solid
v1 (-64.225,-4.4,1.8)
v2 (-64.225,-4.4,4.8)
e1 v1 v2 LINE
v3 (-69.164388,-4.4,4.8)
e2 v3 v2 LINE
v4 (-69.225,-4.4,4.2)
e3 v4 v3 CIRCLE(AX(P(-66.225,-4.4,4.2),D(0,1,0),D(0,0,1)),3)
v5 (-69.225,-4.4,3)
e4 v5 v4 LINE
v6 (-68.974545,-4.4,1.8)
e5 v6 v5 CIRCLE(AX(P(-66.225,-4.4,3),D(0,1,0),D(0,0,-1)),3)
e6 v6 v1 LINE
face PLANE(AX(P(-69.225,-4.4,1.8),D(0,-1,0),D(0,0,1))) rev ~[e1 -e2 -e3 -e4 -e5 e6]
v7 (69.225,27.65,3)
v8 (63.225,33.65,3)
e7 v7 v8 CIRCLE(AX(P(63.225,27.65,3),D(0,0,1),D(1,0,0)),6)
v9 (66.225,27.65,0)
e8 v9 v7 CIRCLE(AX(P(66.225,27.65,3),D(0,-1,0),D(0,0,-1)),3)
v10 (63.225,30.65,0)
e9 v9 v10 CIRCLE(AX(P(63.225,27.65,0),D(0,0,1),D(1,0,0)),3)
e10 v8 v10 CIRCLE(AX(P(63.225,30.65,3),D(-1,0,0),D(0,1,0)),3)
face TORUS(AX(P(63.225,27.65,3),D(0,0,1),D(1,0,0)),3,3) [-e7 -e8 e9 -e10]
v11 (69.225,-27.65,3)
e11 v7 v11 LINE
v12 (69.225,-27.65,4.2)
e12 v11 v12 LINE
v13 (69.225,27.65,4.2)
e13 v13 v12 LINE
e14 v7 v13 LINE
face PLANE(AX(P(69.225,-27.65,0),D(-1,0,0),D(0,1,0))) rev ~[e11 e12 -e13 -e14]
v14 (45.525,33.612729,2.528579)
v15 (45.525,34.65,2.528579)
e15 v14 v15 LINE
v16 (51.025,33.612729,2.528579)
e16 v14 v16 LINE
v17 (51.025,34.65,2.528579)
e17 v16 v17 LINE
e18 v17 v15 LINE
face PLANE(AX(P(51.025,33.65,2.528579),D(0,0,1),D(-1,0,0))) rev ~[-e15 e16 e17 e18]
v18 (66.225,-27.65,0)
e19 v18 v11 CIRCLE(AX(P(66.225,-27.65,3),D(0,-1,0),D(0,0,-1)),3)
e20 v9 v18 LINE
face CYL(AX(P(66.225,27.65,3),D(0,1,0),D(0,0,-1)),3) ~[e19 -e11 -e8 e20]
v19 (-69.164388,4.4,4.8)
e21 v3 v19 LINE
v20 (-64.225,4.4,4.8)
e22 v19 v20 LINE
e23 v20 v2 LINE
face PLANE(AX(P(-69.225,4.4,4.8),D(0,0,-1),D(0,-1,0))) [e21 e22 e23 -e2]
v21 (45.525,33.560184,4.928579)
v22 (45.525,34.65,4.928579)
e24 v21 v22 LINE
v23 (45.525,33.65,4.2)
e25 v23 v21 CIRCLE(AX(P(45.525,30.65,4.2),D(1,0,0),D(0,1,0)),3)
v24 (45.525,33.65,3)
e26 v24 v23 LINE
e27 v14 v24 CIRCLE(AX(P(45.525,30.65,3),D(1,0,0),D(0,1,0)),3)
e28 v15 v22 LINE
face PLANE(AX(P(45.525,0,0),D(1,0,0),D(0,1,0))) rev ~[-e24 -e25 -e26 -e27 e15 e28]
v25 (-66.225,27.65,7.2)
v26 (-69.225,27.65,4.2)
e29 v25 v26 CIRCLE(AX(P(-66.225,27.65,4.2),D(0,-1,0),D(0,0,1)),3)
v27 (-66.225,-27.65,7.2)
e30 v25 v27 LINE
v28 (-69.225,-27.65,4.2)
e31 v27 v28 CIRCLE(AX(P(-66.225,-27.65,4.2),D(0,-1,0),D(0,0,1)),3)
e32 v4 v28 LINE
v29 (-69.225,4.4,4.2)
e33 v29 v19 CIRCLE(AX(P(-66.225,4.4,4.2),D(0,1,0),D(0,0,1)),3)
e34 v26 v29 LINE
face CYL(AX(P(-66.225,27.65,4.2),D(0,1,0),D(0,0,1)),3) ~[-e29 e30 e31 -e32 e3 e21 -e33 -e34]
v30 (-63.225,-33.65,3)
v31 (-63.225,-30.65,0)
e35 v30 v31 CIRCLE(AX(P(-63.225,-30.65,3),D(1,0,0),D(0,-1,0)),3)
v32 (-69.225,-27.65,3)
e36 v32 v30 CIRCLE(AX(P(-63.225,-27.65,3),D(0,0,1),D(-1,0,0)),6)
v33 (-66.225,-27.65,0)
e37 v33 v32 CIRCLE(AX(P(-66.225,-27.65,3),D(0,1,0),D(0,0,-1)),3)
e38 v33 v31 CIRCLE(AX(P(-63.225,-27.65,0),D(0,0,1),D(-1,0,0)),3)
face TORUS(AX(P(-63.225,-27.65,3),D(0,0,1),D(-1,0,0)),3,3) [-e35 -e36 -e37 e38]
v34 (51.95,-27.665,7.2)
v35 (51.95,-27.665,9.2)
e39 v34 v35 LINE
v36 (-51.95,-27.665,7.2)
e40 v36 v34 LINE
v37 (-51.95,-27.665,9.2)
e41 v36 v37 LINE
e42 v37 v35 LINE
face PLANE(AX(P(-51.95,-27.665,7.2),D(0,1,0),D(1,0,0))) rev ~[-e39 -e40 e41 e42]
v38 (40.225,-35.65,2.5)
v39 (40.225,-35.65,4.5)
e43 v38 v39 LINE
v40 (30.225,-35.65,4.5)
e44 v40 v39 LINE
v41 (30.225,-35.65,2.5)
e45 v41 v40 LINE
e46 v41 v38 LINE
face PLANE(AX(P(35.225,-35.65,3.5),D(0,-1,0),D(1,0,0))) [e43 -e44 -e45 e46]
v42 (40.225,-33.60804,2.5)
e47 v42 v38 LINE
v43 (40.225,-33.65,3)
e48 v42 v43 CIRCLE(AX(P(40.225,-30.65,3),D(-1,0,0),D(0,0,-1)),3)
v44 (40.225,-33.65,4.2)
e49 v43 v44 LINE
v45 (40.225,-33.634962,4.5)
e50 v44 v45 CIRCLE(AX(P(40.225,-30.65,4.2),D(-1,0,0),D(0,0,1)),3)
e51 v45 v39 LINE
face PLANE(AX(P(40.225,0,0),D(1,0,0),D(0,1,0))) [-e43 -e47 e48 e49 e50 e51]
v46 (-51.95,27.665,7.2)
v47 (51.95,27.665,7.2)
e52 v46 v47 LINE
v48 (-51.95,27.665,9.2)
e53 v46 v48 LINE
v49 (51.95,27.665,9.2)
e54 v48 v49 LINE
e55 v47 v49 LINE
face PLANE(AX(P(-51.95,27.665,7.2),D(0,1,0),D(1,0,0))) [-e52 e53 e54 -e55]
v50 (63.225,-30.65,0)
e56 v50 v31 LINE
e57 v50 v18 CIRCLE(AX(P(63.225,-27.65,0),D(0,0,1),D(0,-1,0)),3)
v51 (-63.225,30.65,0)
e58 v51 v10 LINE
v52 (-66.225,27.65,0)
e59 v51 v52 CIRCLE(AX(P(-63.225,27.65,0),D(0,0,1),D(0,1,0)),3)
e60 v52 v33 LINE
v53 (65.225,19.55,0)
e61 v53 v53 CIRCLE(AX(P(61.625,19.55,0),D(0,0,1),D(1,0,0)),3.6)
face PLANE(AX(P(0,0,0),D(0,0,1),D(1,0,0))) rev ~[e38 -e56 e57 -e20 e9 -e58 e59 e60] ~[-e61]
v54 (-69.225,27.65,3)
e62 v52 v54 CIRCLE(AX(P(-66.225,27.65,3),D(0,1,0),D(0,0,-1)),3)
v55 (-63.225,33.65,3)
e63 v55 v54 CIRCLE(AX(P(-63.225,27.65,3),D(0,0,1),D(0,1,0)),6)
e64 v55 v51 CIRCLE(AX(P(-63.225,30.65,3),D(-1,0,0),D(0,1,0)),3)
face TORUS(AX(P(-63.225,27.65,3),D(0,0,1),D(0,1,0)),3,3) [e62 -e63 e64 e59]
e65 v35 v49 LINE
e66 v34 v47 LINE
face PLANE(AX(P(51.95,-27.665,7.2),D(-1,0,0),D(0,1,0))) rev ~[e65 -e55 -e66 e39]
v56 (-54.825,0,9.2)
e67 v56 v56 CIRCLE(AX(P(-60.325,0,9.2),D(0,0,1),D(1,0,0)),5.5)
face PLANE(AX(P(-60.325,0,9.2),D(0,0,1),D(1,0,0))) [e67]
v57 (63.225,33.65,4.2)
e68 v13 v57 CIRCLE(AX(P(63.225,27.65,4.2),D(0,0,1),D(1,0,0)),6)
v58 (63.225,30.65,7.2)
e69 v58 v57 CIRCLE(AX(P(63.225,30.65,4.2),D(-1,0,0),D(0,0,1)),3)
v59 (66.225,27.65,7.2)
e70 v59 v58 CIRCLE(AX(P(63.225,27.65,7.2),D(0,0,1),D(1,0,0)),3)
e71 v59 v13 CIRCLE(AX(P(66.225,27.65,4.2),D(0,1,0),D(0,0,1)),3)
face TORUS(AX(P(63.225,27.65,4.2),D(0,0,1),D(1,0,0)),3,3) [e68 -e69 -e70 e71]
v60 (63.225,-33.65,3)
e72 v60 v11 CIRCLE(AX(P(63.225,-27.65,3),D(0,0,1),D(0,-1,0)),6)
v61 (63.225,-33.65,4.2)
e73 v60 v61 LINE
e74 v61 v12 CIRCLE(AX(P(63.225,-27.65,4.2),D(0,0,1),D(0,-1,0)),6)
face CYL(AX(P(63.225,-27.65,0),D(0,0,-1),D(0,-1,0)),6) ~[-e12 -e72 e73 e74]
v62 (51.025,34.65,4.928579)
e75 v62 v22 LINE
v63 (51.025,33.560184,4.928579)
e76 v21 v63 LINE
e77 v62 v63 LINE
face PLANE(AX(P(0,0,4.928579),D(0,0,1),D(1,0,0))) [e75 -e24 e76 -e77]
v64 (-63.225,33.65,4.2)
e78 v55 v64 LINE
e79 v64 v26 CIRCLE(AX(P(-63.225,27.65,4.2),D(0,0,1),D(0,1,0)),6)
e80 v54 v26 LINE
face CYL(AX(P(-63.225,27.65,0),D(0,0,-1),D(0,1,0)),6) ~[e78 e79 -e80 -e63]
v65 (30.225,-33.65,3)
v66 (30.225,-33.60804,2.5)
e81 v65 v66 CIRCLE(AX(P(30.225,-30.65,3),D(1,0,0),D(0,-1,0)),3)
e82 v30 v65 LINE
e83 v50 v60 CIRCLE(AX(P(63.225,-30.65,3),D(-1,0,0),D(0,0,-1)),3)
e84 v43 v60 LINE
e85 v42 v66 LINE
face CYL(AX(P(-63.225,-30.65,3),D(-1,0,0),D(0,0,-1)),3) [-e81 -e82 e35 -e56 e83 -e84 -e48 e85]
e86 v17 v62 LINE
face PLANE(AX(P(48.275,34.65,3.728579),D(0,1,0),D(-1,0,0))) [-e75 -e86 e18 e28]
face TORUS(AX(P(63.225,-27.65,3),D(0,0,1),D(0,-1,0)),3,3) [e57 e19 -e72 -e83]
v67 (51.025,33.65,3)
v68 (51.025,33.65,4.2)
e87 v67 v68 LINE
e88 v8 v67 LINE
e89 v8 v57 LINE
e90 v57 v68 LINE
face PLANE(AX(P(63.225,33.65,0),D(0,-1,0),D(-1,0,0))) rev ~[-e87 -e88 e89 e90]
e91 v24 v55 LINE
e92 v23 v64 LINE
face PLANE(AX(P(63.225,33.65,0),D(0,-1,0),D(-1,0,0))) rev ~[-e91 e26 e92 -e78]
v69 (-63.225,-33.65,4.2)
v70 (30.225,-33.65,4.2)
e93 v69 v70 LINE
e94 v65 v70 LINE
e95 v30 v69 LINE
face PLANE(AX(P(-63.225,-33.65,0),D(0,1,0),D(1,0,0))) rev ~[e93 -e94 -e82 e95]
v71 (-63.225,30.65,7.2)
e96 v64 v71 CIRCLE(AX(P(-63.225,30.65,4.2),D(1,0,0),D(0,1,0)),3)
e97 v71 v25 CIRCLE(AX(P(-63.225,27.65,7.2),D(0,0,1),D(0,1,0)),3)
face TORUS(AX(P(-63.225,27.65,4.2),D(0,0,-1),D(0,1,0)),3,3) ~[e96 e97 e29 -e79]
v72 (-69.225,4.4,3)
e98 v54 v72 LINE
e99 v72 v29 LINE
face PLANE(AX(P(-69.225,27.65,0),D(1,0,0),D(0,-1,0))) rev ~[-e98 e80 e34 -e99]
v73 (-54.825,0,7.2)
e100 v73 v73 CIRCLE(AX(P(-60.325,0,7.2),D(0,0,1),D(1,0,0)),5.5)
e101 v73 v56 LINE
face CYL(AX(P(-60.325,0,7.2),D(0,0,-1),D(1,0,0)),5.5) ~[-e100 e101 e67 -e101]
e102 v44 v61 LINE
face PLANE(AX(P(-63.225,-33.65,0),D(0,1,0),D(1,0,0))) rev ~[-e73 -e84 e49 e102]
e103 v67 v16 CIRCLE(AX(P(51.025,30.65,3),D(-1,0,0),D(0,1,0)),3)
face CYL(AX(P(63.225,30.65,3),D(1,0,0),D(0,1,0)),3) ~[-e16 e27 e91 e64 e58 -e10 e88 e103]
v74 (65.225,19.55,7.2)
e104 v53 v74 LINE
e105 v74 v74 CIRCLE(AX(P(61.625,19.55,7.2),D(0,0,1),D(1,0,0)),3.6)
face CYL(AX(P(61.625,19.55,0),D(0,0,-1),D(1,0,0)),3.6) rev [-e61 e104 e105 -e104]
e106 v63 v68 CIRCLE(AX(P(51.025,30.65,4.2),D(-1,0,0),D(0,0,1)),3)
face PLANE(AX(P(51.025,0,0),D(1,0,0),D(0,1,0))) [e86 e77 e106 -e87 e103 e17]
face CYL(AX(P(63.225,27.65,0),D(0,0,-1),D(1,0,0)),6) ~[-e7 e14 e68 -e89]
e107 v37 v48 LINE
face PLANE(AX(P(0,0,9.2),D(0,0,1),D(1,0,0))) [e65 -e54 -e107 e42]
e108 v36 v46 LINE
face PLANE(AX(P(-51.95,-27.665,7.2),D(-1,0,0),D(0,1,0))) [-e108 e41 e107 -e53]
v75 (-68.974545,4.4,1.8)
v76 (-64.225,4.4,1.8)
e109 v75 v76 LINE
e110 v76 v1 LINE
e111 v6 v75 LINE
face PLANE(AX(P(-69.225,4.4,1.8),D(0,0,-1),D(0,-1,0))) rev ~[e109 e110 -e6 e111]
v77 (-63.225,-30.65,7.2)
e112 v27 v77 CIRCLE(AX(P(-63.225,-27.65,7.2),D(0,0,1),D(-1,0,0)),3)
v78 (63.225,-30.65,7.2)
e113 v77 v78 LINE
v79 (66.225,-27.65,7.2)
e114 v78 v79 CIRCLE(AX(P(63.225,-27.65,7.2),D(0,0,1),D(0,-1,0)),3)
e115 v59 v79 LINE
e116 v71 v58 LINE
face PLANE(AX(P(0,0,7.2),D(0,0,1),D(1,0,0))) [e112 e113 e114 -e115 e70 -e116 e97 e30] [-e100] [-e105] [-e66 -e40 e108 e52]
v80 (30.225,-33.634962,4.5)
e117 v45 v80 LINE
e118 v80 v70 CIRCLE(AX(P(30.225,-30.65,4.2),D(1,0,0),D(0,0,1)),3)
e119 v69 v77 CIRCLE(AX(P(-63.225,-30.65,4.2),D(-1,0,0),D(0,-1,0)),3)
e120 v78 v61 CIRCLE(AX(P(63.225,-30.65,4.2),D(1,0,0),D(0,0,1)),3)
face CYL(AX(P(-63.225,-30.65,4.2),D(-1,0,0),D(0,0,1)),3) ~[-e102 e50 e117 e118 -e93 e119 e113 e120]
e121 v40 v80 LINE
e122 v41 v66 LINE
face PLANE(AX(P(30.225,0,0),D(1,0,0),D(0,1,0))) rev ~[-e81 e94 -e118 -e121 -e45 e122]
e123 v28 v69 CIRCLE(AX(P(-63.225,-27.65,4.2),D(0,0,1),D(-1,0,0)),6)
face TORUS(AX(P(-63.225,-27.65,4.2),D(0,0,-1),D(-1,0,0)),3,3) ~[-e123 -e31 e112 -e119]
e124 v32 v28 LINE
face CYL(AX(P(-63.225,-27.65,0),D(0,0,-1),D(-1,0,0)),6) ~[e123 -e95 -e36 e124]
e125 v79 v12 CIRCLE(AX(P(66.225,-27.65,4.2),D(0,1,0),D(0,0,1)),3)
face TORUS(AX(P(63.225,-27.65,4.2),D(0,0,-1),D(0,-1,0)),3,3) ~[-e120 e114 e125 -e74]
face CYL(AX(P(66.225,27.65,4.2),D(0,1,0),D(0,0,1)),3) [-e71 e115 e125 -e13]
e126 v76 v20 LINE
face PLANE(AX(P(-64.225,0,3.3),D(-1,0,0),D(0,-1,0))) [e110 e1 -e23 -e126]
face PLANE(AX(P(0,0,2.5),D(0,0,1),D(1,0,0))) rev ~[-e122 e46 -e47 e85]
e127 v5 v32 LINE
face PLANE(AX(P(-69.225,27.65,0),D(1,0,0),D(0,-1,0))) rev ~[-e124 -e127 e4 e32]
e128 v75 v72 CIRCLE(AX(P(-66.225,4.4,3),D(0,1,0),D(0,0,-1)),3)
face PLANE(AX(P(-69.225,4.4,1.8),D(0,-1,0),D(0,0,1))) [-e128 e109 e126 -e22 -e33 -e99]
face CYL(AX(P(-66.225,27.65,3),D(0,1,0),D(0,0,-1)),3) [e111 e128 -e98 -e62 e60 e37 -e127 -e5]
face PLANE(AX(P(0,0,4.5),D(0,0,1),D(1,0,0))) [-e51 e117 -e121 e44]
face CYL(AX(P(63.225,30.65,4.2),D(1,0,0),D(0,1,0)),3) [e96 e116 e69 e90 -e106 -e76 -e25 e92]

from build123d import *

# Parameters (mm, degrees)
F0_R          = 3.6
F1_DEPTH      = 7.2
F2_W          = 5.5
F2_H          = 2.4
F3_DEPTH      = 1
F4_W          = 10
F4_H          = 2
F5_DEPTH      = 2
F6_W          = 8.8
F6_H          = 3
F7_DEPTH      = 5
F8_R          = 5.5
F9_DEPTH      = 2
F10_W         = 103.9
F10_H         = 55.33
F11_DEPTH     = 2
F12_T1_DEPTH  = 55.3
F12_T6_DEPTH  = 126.45
F12_T12_DEPTH = 126.45
F12_T18_DEPTH = 126.45
F12_T25_DEPTH = 126.45
F12_T31_DEPTH = 126.45
F12_T35_ANGLE = 90
F12_T39_DEPTH = 126.45
F12_T45_DEPTH = 126.45
F12_T51_DEPTH = 126.45
F12_T58_DEPTH = 126.45
F12_T64_DEPTH = 126.45
F12_T68_ANGLE = 90
F12_T70_ANGLE = 90
F12_T72_ANGLE = 90
F13_T1_DEPTH  = 55.3
F13_T6_DEPTH  = 126.45
F13_T12_DEPTH = 126.45
F13_T18_DEPTH = 126.45
F13_T25_DEPTH = 126.45
F13_T31_DEPTH = 126.45
F13_T35_ANGLE = 90
F13_T37_ANGLE = 90
F13_T41_DEPTH = 126.45
F13_T47_DEPTH = 126.45
F13_T53_DEPTH = 126.45
F13_T60_DEPTH = 126.45
F13_T66_DEPTH = 126.45
F13_T70_ANGLE = 90
F13_T72_ANGLE = 90


# Not quite as in the source:
# - a fillet or chamfer that OpenCascade refuses, or shapes differently, is made with other operations: its cross-section is extruded or revolved along the edge and cut away or added


with BuildPart() as f1:
    # F0 (on Top) → F1 (new body)
    with BuildSketch(Plane.XY):
        with BuildLine():
            Line((63.225, 33.65), (-63.225, 33.65))
            ThreePointArc((-63.225, 33.65), (-67.4676406871, 31.8926406871), (-69.225, 27.65))
            Line((-69.225, 27.65), (-69.225, -27.65))
            ThreePointArc((-69.225, -27.65), (-67.4676406871, -31.8926406871), (-63.225, -33.65))
            Line((-63.225, -33.65), (63.225, -33.65))
            ThreePointArc((63.225, -33.65), (67.4676406871, -31.8926406871), (69.225, -27.65))
            Line((69.225, -27.65), (69.225, 27.65))
            ThreePointArc((69.225, 27.65), (67.4676406871, 31.8926406871), (63.225, 33.65))
        make_face()
        with Locations((61.625, 19.55)):
            Circle(F0_R, mode=Mode.SUBTRACT)
    extrude(amount=F1_DEPTH)

    # F2 (on face) → F3 (join)
    with BuildSketch(Plane(origin=(0, 33.65, 0), x_dir=(-1, 0, 0), z_dir=(0, 1, 0))):
        with Locations((-48.275, 3.7285785931)):
            Rectangle(F2_W, F2_H)
    extrude(amount=F3_DEPTH)

    # F4 (on face) → F5 (join)
    with BuildSketch(Plane.XZ.offset(33.65)):
        with Locations((35.225, 3.5)):
            Rectangle(F4_W, F4_H)
    extrude(amount=F5_DEPTH)

    # F6 (on face) → F7 (cut)
    with BuildSketch(Plane(origin=(-69.225, 0, 0), x_dir=(0, -1, 0), z_dir=(-1, 0, 0))):
        with Locations((0, 3.3)):
            Rectangle(F6_W, F6_H)
    extrude(amount=-F7_DEPTH, mode=Mode.SUBTRACT)

    # F8 (on face) → F9 (join)
    with BuildSketch(Plane.XY.offset(7.2)):
        with Locations((-60.325, 0)):
            Circle(F8_R)
    extrude(amount=F9_DEPTH)

    # F10 (on face) → F11 (join)
    with BuildSketch(Plane.XY.offset(7.2)):
        Rectangle(F10_W, F10_H)
    extrude(amount=F11_DEPTH)

    # F12: fillet of radius 3 on 8 edges, made by hand

    # F12_s2 → F12_t1 (cut)
    with BuildSketch(Plane.XZ.offset(-27.65)):
        with BuildLine():
            ThreePointArc((-66.225, 7.2), (-68.3463203436, 6.3213203436), (-69.225, 4.2))
            Line((-69.225, 4.2), (-69.225, 7.2))
            Line((-69.225, 7.2), (-66.225, 7.2))
        make_face()
        with BuildLine():
            ThreePointArc((66.225, 7.2), (68.3463203436, 6.3213203436), (69.225, 4.2))
            Line((69.225, 4.2), (69.225, 7.2))
            Line((69.225, 7.2), (66.225, 7.2))
        make_face()
    extrude(amount=F12_T1_DEPTH, mode=Mode.SUBTRACT)


with BuildPart() as f12_tool4:
    # F12_s5 → F12_t6 (new body)
    with BuildSketch(Plane.YZ.offset(63.225)):
        with BuildLine():
            ThreePointArc((33.65, 4.2), (32.7713203436, 6.3213203436), (30.65, 7.2))
            Line((30.65, 7.2), (33.65, 7.2))
            Line((33.65, 7.2), (33.65, 4.2))
        make_face()
    extrude(amount=-F12_T6_DEPTH)

    split(bisect_by=Plane.XY.offset(4.9285785931), keep=Keep.BOTTOM)

    split(bisect_by=Plane.YZ.offset(51.025), keep=Keep.TOP)


with BuildPart() as f1_1:
    add(f1.part)

    # F12_t3: cut F12_tool4
    add(f12_tool4.part, mode=Mode.SUBTRACT)


with BuildPart() as f12_tool10:
    # F12_s11 → F12_t12 (new body)
    with BuildSketch(Plane.YZ.offset(63.225)):
        with BuildLine():
            ThreePointArc((33.65, 4.2), (32.7713203436, 6.3213203436), (30.65, 7.2))
            Line((30.65, 7.2), (33.65, 7.2))
            Line((33.65, 7.2), (33.65, 4.2))
        make_face()
    extrude(amount=-F12_T12_DEPTH)

    split(bisect_by=Plane.XY.offset(4.9285785931), keep=Keep.TOP)

    split(bisect_by=Plane.YZ.offset(51.025), keep=Keep.TOP)


with BuildPart() as f1_2:
    add(f1_1.part)

    # F12_t9: cut F12_tool10
    add(f12_tool10.part, mode=Mode.SUBTRACT)


with BuildPart() as f12_tool16:
    # F12_s17 → F12_t18 (new body)
    with BuildSketch(Plane.YZ.offset(63.225)):
        with BuildLine():
            ThreePointArc((33.65, 4.2), (32.7713203436, 6.3213203436), (30.65, 7.2))
            Line((30.65, 7.2), (33.65, 7.2))
            Line((33.65, 7.2), (33.65, 4.2))
        make_face()
    extrude(amount=-F12_T18_DEPTH)

    split(bisect_by=Plane.XY.offset(4.9285785931), keep=Keep.TOP)

    split(bisect_by=Plane.YZ.offset(45.525), keep=Keep.TOP)

    split(bisect_by=Plane.YZ.offset(51.025), keep=Keep.BOTTOM)


with BuildPart() as f1_3:
    add(f1_2.part)

    # F12_t15: cut F12_tool16
    add(f12_tool16.part, mode=Mode.SUBTRACT)


with BuildPart() as f12_tool23:
    # F12_s24 → F12_t25 (new body)
    with BuildSketch(Plane.YZ.offset(63.225)):
        with BuildLine():
            ThreePointArc((33.65, 4.2), (32.7713203436, 6.3213203436), (30.65, 7.2))
            Line((30.65, 7.2), (33.65, 7.2))
            Line((33.65, 7.2), (33.65, 4.2))
        make_face()
    extrude(amount=-F12_T25_DEPTH)

    split(bisect_by=Plane.XY.offset(4.9285785931), keep=Keep.BOTTOM)

    split(bisect_by=Plane.YZ.offset(45.525), keep=Keep.BOTTOM)


with BuildPart() as f1_4:
    add(f1_3.part)

    # F12_t22: cut F12_tool23
    add(f12_tool23.part, mode=Mode.SUBTRACT)


with BuildPart() as f12_tool29:
    # F12_s30 → F12_t31 (new body)
    with BuildSketch(Plane.YZ.offset(63.225)):
        with BuildLine():
            ThreePointArc((33.65, 4.2), (32.7713203436, 6.3213203436), (30.65, 7.2))
            Line((30.65, 7.2), (33.65, 7.2))
            Line((33.65, 7.2), (33.65, 4.2))
        make_face()
    extrude(amount=-F12_T31_DEPTH)

    split(bisect_by=Plane.XY.offset(4.9285785931), keep=Keep.TOP)

    split(bisect_by=Plane.YZ.offset(45.525), keep=Keep.BOTTOM)


with BuildPart() as f1_5:
    add(f1_4.part)

    # F12_t28: cut F12_tool29
    add(f12_tool29.part, mode=Mode.SUBTRACT)

    # F12_s34 → F12_t35 (revolve, cut)
    with BuildSketch(Plane.YZ.offset(-63.225)):
        with BuildLine():
            ThreePointArc((30.65, 7.2), (32.7713203436, 6.3213203436), (33.65, 4.2))
            Line((33.65, 4.2), (33.65, 7.2))
            Line((33.65, 7.2), (30.65, 7.2))
        make_face()
    revolve(axis=Axis((-63.225, 27.65, 7.2), (0, 0, 1)), revolution_arc=F12_T35_ANGLE, mode=Mode.SUBTRACT)


with BuildPart() as f12_tool37:
    # F12_s38 → F12_t39 (new body)
    with BuildSketch(Plane.YZ.offset(-63.225)):
        with BuildLine():
            ThreePointArc((-30.65, 7.2), (-32.7713203436, 6.3213203436), (-33.65, 4.2))
            Line((-33.65, 4.2), (-33.65, 7.2))
            Line((-33.65, 7.2), (-30.65, 7.2))
        make_face()
    extrude(amount=F12_T39_DEPTH)

    split(bisect_by=Plane.YZ.offset(30.225), keep=Keep.BOTTOM)

    split(bisect_by=Plane.XY.offset(4.5), keep=Keep.TOP)


with BuildPart() as f1_6:
    add(f1_5.part)

    # F12_t36: cut F12_tool37
    add(f12_tool37.part, mode=Mode.SUBTRACT)


with BuildPart() as f12_tool43:
    # F12_s44 → F12_t45 (new body)
    with BuildSketch(Plane.YZ.offset(-63.225)):
        with BuildLine():
            ThreePointArc((-30.65, 7.2), (-32.7713203436, 6.3213203436), (-33.65, 4.2))
            Line((-33.65, 4.2), (-33.65, 7.2))
            Line((-33.65, 7.2), (-30.65, 7.2))
        make_face()
    extrude(amount=F12_T45_DEPTH)

    split(bisect_by=Plane.YZ.offset(30.225), keep=Keep.BOTTOM)

    split(bisect_by=Plane.XY.offset(4.5), keep=Keep.BOTTOM)


with BuildPart() as f1_7:
    add(f1_6.part)

    # F12_t42: cut F12_tool43
    add(f12_tool43.part, mode=Mode.SUBTRACT)


with BuildPart() as f12_tool49:
    # F12_s50 → F12_t51 (new body)
    with BuildSketch(Plane.YZ.offset(-63.225)):
        with BuildLine():
            ThreePointArc((-30.65, 7.2), (-32.7713203436, 6.3213203436), (-33.65, 4.2))
            Line((-33.65, 4.2), (-33.65, 7.2))
            Line((-33.65, 7.2), (-30.65, 7.2))
        make_face()
    extrude(amount=F12_T51_DEPTH)

    split(bisect_by=Plane.YZ.offset(30.225), keep=Keep.TOP)

    split(bisect_by=Plane.XY.offset(4.5), keep=Keep.TOP)

    split(bisect_by=Plane.YZ.offset(40.225), keep=Keep.BOTTOM)


with BuildPart() as f1_8:
    add(f1_7.part)

    # F12_t48: cut F12_tool49
    add(f12_tool49.part, mode=Mode.SUBTRACT)


with BuildPart() as f12_tool56:
    # F12_s57 → F12_t58 (new body)
    with BuildSketch(Plane.YZ.offset(-63.225)):
        with BuildLine():
            ThreePointArc((-30.65, 7.2), (-32.7713203436, 6.3213203436), (-33.65, 4.2))
            Line((-33.65, 4.2), (-33.65, 7.2))
            Line((-33.65, 7.2), (-30.65, 7.2))
        make_face()
    extrude(amount=F12_T58_DEPTH)

    split(bisect_by=Plane.XY.offset(4.5), keep=Keep.TOP)

    split(bisect_by=Plane.YZ.offset(40.225), keep=Keep.TOP)


with BuildPart() as f1_9:
    add(f1_8.part)

    # F12_t55: cut F12_tool56
    add(f12_tool56.part, mode=Mode.SUBTRACT)


with BuildPart() as f12_tool62:
    # F12_s63 → F12_t64 (new body)
    with BuildSketch(Plane.YZ.offset(-63.225)):
        with BuildLine():
            ThreePointArc((-30.65, 7.2), (-32.7713203436, 6.3213203436), (-33.65, 4.2))
            Line((-33.65, 4.2), (-33.65, 7.2))
            Line((-33.65, 7.2), (-30.65, 7.2))
        make_face()
    extrude(amount=F12_T64_DEPTH)

    split(bisect_by=Plane.XY.offset(4.5), keep=Keep.BOTTOM)

    split(bisect_by=Plane.YZ.offset(40.225), keep=Keep.TOP)


with BuildPart() as f1_10:
    add(f1_9.part)

    # F12_t61: cut F12_tool62
    add(f12_tool62.part, mode=Mode.SUBTRACT)

    # F12_s67 → F12_t68 (revolve, cut)
    with BuildSketch(Plane.XZ.offset(27.65)):
        with BuildLine():
            ThreePointArc((-66.225, 7.2), (-68.3463203436, 6.3213203436), (-69.225, 4.2))
            Line((-69.225, 4.2), (-69.225, 7.2))
            Line((-69.225, 7.2), (-66.225, 7.2))
        make_face()
    revolve(axis=Axis((-63.225, -27.65, 7.2), (0, 0, 1)), revolution_arc=F12_T68_ANGLE, mode=Mode.SUBTRACT)

    # F12_s69 → F12_t70 (revolve, cut)
    with BuildSketch(Plane.YZ.offset(63.225)):
        with BuildLine():
            ThreePointArc((-30.65, 7.2), (-32.7713203436, 6.3213203436), (-33.65, 4.2))
            Line((-33.65, 4.2), (-33.65, 7.2))
            Line((-33.65, 7.2), (-30.65, 7.2))
        make_face()
    revolve(axis=Axis((63.225, -27.65, 7.2), (0, 0, 1)), revolution_arc=F12_T70_ANGLE, mode=Mode.SUBTRACT)

    # F12_s71 → F12_t72 (revolve, cut)
    with BuildSketch(Plane.XZ.offset(-27.65)):
        with BuildLine():
            ThreePointArc((69.225, 4.2), (68.3463203436, 6.3213203436), (66.225, 7.2))
            Line((66.225, 7.2), (69.225, 7.2))
            Line((69.225, 7.2), (69.225, 4.2))
        make_face()
    revolve(axis=Axis((63.225, 27.65, 7.2), (0, 0, 1)), revolution_arc=F12_T72_ANGLE, mode=Mode.SUBTRACT)

    # F13: fillet of radius 3 on 8 edges, made by hand

    # F13_s2 → F13_t1 (cut)
    with BuildSketch(Plane.XZ.offset(-27.65)):
        with BuildLine():
            ThreePointArc((-66.225, 0), (-68.3463203436, 0.8786796564), (-69.225, 3))
            Line((-69.225, 3), (-69.225, 0))
            Line((-69.225, 0), (-66.225, 0))
        make_face()
        with BuildLine():
            ThreePointArc((66.225, 0), (68.3463203436, 0.8786796564), (69.225, 3))
            Line((69.225, 3), (69.225, 0))
            Line((69.225, 0), (66.225, 0))
        make_face()
    extrude(amount=F13_T1_DEPTH, mode=Mode.SUBTRACT)


with BuildPart() as f13_tool4:
    # F13_s5 → F13_t6 (new body)
    with BuildSketch(Plane.YZ.offset(-63.225)):
        with BuildLine():
            ThreePointArc((-30.65, 0), (-32.7713203436, 0.8786796564), (-33.65, 3))
            Line((-33.65, 3), (-33.65, 0))
            Line((-33.65, 0), (-30.65, 0))
        make_face()
    extrude(amount=F13_T6_DEPTH)

    split(bisect_by=Plane.XY.offset(2.5), keep=Keep.BOTTOM)

    split(bisect_by=Plane.YZ.offset(30.225), keep=Keep.BOTTOM)


with BuildPart() as f1_11:
    add(f1_10.part)

    # F13_t3: cut F13_tool4
    add(f13_tool4.part, mode=Mode.SUBTRACT)


with BuildPart() as f13_tool10:
    # F13_s11 → F13_t12 (new body)
    with BuildSketch(Plane.YZ.offset(-63.225)):
        with BuildLine():
            ThreePointArc((-30.65, 0), (-32.7713203436, 0.8786796564), (-33.65, 3))
            Line((-33.65, 3), (-33.65, 0))
            Line((-33.65, 0), (-30.65, 0))
        make_face()
    extrude(amount=F13_T12_DEPTH)

    split(bisect_by=Plane.XY.offset(2.5), keep=Keep.TOP)

    split(bisect_by=Plane.YZ.offset(30.225), keep=Keep.BOTTOM)


with BuildPart() as f1_12:
    add(f1_11.part)

    # F13_t9: cut F13_tool10
    add(f13_tool10.part, mode=Mode.SUBTRACT)


with BuildPart() as f13_tool16:
    # F13_s17 → F13_t18 (new body)
    with BuildSketch(Plane.YZ.offset(-63.225)):
        with BuildLine():
            ThreePointArc((-30.65, 0), (-32.7713203436, 0.8786796564), (-33.65, 3))
            Line((-33.65, 3), (-33.65, 0))
            Line((-33.65, 0), (-30.65, 0))
        make_face()
    extrude(amount=F13_T18_DEPTH)

    split(bisect_by=Plane.YZ.offset(40.225), keep=Keep.BOTTOM)

    split(bisect_by=Plane.XY.offset(2.5), keep=Keep.BOTTOM)

    split(bisect_by=Plane.YZ.offset(30.225), keep=Keep.TOP)


with BuildPart() as f1_13:
    add(f1_12.part)

    # F13_t15: cut F13_tool16
    add(f13_tool16.part, mode=Mode.SUBTRACT)


with BuildPart() as f13_tool23:
    # F13_s24 → F13_t25 (new body)
    with BuildSketch(Plane.YZ.offset(-63.225)):
        with BuildLine():
            ThreePointArc((-30.65, 0), (-32.7713203436, 0.8786796564), (-33.65, 3))
            Line((-33.65, 3), (-33.65, 0))
            Line((-33.65, 0), (-30.65, 0))
        make_face()
    extrude(amount=F13_T25_DEPTH)

    split(bisect_by=Plane.YZ.offset(40.225), keep=Keep.TOP)

    split(bisect_by=Plane.XY.offset(2.5), keep=Keep.BOTTOM)


with BuildPart() as f1_14:
    add(f1_13.part)

    # F13_t22: cut F13_tool23
    add(f13_tool23.part, mode=Mode.SUBTRACT)


with BuildPart() as f13_tool29:
    # F13_s30 → F13_t31 (new body)
    with BuildSketch(Plane.YZ.offset(-63.225)):
        with BuildLine():
            ThreePointArc((-30.65, 0), (-32.7713203436, 0.8786796564), (-33.65, 3))
            Line((-33.65, 3), (-33.65, 0))
            Line((-33.65, 0), (-30.65, 0))
        make_face()
    extrude(amount=F13_T31_DEPTH)

    split(bisect_by=Plane.YZ.offset(40.225), keep=Keep.TOP)

    split(bisect_by=Plane.XY.offset(2.5), keep=Keep.TOP)


with BuildPart() as f1_15:
    add(f1_14.part)

    # F13_t28: cut F13_tool29
    add(f13_tool29.part, mode=Mode.SUBTRACT)

    # F13_s34 → F13_t35 (revolve, cut)
    with BuildSketch(Plane.XZ.offset(27.65)):
        with BuildLine():
            ThreePointArc((-66.225, 0), (-68.3463203436, 0.8786796564), (-69.225, 3))
            Line((-69.225, 3), (-69.225, 0))
            Line((-69.225, 0), (-66.225, 0))
        make_face()
    revolve(axis=Axis((-63.225, -27.65, 0), (0, 0, 1)), revolution_arc=F13_T35_ANGLE, mode=Mode.SUBTRACT)

    # F13_s36 → F13_t37 (revolve, cut)
    with BuildSketch(Plane.YZ.offset(-63.225)):
        with BuildLine():
            ThreePointArc((30.65, 0), (32.7713203436, 0.8786796564), (33.65, 3))
            Line((33.65, 3), (33.65, 0))
            Line((33.65, 0), (30.65, 0))
        make_face()
    revolve(axis=Axis((-63.225, 27.65, 0), (0, 0, 1)), revolution_arc=F13_T37_ANGLE, mode=Mode.SUBTRACT)


with BuildPart() as f13_tool39:
    # F13_s40 → F13_t41 (new body)
    with BuildSketch(Plane.YZ.offset(63.225)):
        with BuildLine():
            ThreePointArc((33.65, 3), (32.7713203436, 0.8786796564), (30.65, 0))
            Line((30.65, 0), (33.65, 0))
            Line((33.65, 0), (33.65, 3))
        make_face()
    extrude(amount=-F13_T41_DEPTH)

    split(bisect_by=Plane.XY.offset(2.5285785931), keep=Keep.TOP)

    split(bisect_by=Plane.YZ.offset(51.025), keep=Keep.TOP)


with BuildPart() as f1_16:
    add(f1_15.part)

    # F13_t38: cut F13_tool39
    add(f13_tool39.part, mode=Mode.SUBTRACT)


with BuildPart() as f13_tool45:
    # F13_s46 → F13_t47 (new body)
    with BuildSketch(Plane.YZ.offset(63.225)):
        with BuildLine():
            ThreePointArc((33.65, 3), (32.7713203436, 0.8786796564), (30.65, 0))
            Line((30.65, 0), (33.65, 0))
            Line((33.65, 0), (33.65, 3))
        make_face()
    extrude(amount=-F13_T47_DEPTH)

    split(bisect_by=Plane.XY.offset(2.5285785931), keep=Keep.BOTTOM)

    split(bisect_by=Plane.YZ.offset(51.025), keep=Keep.TOP)


with BuildPart() as f1_17:
    add(f1_16.part)

    # F13_t44: cut F13_tool45
    add(f13_tool45.part, mode=Mode.SUBTRACT)


with BuildPart() as f13_tool51:
    # F13_s52 → F13_t53 (new body)
    with BuildSketch(Plane.YZ.offset(63.225)):
        with BuildLine():
            ThreePointArc((33.65, 3), (32.7713203436, 0.8786796564), (30.65, 0))
            Line((30.65, 0), (33.65, 0))
            Line((33.65, 0), (33.65, 3))
        make_face()
    extrude(amount=-F13_T53_DEPTH)

    split(bisect_by=Plane.YZ.offset(45.525), keep=Keep.TOP)

    split(bisect_by=Plane.XY.offset(2.5285785931), keep=Keep.BOTTOM)

    split(bisect_by=Plane.YZ.offset(51.025), keep=Keep.BOTTOM)


with BuildPart() as f1_18:
    add(f1_17.part)

    # F13_t50: cut F13_tool51
    add(f13_tool51.part, mode=Mode.SUBTRACT)


with BuildPart() as f13_tool58:
    # F13_s59 → F13_t60 (new body)
    with BuildSketch(Plane.YZ.offset(63.225)):
        with BuildLine():
            ThreePointArc((33.65, 3), (32.7713203436, 0.8786796564), (30.65, 0))
            Line((30.65, 0), (33.65, 0))
            Line((33.65, 0), (33.65, 3))
        make_face()
    extrude(amount=-F13_T60_DEPTH)

    split(bisect_by=Plane.YZ.offset(45.525), keep=Keep.BOTTOM)

    split(bisect_by=Plane.XY.offset(2.5285785931), keep=Keep.TOP)


with BuildPart() as f1_19:
    add(f1_18.part)

    # F13_t57: cut F13_tool58
    add(f13_tool58.part, mode=Mode.SUBTRACT)


with BuildPart() as f13_tool64:
    # F13_s65 → F13_t66 (new body)
    with BuildSketch(Plane.YZ.offset(63.225)):
        with BuildLine():
            ThreePointArc((33.65, 3), (32.7713203436, 0.8786796564), (30.65, 0))
            Line((30.65, 0), (33.65, 0))
            Line((33.65, 0), (33.65, 3))
        make_face()
    extrude(amount=-F13_T66_DEPTH)

    split(bisect_by=Plane.YZ.offset(45.525), keep=Keep.BOTTOM)

    split(bisect_by=Plane.XY.offset(2.5285785931), keep=Keep.BOTTOM)


with BuildPart() as f1_20:
    add(f1_19.part)

    # F13_t63: cut F13_tool64
    add(f13_tool64.part, mode=Mode.SUBTRACT)

    # F13_s69 → F13_t70 (revolve, cut)
    with BuildSketch(Plane.XZ.offset(-27.65)):
        with BuildLine():
            ThreePointArc((66.225, 0), (68.3463203436, 0.8786796564), (69.225, 3))
            Line((69.225, 3), (69.225, 0))
            Line((69.225, 0), (66.225, 0))
        make_face()
    revolve(axis=Axis((63.225, 27.65, 0), (0, 0, 1)), revolution_arc=F13_T70_ANGLE, mode=Mode.SUBTRACT)

    # F13_s71 → F13_t72 (revolve, cut)
    with BuildSketch(Plane.YZ.offset(63.225)):
        with BuildLine():
            ThreePointArc((-30.65, 0), (-32.7713203436, 0.8786796564), (-33.65, 3))
            Line((-33.65, 3), (-33.65, 0))
            Line((-33.65, 0), (-30.65, 0))
        make_face()
    revolve(axis=Axis((63.225, -27.65, 0), (0, 0, 1)), revolution_arc=F13_T72_ANGLE, mode=Mode.SUBTRACT)


solid = f1_20.part
